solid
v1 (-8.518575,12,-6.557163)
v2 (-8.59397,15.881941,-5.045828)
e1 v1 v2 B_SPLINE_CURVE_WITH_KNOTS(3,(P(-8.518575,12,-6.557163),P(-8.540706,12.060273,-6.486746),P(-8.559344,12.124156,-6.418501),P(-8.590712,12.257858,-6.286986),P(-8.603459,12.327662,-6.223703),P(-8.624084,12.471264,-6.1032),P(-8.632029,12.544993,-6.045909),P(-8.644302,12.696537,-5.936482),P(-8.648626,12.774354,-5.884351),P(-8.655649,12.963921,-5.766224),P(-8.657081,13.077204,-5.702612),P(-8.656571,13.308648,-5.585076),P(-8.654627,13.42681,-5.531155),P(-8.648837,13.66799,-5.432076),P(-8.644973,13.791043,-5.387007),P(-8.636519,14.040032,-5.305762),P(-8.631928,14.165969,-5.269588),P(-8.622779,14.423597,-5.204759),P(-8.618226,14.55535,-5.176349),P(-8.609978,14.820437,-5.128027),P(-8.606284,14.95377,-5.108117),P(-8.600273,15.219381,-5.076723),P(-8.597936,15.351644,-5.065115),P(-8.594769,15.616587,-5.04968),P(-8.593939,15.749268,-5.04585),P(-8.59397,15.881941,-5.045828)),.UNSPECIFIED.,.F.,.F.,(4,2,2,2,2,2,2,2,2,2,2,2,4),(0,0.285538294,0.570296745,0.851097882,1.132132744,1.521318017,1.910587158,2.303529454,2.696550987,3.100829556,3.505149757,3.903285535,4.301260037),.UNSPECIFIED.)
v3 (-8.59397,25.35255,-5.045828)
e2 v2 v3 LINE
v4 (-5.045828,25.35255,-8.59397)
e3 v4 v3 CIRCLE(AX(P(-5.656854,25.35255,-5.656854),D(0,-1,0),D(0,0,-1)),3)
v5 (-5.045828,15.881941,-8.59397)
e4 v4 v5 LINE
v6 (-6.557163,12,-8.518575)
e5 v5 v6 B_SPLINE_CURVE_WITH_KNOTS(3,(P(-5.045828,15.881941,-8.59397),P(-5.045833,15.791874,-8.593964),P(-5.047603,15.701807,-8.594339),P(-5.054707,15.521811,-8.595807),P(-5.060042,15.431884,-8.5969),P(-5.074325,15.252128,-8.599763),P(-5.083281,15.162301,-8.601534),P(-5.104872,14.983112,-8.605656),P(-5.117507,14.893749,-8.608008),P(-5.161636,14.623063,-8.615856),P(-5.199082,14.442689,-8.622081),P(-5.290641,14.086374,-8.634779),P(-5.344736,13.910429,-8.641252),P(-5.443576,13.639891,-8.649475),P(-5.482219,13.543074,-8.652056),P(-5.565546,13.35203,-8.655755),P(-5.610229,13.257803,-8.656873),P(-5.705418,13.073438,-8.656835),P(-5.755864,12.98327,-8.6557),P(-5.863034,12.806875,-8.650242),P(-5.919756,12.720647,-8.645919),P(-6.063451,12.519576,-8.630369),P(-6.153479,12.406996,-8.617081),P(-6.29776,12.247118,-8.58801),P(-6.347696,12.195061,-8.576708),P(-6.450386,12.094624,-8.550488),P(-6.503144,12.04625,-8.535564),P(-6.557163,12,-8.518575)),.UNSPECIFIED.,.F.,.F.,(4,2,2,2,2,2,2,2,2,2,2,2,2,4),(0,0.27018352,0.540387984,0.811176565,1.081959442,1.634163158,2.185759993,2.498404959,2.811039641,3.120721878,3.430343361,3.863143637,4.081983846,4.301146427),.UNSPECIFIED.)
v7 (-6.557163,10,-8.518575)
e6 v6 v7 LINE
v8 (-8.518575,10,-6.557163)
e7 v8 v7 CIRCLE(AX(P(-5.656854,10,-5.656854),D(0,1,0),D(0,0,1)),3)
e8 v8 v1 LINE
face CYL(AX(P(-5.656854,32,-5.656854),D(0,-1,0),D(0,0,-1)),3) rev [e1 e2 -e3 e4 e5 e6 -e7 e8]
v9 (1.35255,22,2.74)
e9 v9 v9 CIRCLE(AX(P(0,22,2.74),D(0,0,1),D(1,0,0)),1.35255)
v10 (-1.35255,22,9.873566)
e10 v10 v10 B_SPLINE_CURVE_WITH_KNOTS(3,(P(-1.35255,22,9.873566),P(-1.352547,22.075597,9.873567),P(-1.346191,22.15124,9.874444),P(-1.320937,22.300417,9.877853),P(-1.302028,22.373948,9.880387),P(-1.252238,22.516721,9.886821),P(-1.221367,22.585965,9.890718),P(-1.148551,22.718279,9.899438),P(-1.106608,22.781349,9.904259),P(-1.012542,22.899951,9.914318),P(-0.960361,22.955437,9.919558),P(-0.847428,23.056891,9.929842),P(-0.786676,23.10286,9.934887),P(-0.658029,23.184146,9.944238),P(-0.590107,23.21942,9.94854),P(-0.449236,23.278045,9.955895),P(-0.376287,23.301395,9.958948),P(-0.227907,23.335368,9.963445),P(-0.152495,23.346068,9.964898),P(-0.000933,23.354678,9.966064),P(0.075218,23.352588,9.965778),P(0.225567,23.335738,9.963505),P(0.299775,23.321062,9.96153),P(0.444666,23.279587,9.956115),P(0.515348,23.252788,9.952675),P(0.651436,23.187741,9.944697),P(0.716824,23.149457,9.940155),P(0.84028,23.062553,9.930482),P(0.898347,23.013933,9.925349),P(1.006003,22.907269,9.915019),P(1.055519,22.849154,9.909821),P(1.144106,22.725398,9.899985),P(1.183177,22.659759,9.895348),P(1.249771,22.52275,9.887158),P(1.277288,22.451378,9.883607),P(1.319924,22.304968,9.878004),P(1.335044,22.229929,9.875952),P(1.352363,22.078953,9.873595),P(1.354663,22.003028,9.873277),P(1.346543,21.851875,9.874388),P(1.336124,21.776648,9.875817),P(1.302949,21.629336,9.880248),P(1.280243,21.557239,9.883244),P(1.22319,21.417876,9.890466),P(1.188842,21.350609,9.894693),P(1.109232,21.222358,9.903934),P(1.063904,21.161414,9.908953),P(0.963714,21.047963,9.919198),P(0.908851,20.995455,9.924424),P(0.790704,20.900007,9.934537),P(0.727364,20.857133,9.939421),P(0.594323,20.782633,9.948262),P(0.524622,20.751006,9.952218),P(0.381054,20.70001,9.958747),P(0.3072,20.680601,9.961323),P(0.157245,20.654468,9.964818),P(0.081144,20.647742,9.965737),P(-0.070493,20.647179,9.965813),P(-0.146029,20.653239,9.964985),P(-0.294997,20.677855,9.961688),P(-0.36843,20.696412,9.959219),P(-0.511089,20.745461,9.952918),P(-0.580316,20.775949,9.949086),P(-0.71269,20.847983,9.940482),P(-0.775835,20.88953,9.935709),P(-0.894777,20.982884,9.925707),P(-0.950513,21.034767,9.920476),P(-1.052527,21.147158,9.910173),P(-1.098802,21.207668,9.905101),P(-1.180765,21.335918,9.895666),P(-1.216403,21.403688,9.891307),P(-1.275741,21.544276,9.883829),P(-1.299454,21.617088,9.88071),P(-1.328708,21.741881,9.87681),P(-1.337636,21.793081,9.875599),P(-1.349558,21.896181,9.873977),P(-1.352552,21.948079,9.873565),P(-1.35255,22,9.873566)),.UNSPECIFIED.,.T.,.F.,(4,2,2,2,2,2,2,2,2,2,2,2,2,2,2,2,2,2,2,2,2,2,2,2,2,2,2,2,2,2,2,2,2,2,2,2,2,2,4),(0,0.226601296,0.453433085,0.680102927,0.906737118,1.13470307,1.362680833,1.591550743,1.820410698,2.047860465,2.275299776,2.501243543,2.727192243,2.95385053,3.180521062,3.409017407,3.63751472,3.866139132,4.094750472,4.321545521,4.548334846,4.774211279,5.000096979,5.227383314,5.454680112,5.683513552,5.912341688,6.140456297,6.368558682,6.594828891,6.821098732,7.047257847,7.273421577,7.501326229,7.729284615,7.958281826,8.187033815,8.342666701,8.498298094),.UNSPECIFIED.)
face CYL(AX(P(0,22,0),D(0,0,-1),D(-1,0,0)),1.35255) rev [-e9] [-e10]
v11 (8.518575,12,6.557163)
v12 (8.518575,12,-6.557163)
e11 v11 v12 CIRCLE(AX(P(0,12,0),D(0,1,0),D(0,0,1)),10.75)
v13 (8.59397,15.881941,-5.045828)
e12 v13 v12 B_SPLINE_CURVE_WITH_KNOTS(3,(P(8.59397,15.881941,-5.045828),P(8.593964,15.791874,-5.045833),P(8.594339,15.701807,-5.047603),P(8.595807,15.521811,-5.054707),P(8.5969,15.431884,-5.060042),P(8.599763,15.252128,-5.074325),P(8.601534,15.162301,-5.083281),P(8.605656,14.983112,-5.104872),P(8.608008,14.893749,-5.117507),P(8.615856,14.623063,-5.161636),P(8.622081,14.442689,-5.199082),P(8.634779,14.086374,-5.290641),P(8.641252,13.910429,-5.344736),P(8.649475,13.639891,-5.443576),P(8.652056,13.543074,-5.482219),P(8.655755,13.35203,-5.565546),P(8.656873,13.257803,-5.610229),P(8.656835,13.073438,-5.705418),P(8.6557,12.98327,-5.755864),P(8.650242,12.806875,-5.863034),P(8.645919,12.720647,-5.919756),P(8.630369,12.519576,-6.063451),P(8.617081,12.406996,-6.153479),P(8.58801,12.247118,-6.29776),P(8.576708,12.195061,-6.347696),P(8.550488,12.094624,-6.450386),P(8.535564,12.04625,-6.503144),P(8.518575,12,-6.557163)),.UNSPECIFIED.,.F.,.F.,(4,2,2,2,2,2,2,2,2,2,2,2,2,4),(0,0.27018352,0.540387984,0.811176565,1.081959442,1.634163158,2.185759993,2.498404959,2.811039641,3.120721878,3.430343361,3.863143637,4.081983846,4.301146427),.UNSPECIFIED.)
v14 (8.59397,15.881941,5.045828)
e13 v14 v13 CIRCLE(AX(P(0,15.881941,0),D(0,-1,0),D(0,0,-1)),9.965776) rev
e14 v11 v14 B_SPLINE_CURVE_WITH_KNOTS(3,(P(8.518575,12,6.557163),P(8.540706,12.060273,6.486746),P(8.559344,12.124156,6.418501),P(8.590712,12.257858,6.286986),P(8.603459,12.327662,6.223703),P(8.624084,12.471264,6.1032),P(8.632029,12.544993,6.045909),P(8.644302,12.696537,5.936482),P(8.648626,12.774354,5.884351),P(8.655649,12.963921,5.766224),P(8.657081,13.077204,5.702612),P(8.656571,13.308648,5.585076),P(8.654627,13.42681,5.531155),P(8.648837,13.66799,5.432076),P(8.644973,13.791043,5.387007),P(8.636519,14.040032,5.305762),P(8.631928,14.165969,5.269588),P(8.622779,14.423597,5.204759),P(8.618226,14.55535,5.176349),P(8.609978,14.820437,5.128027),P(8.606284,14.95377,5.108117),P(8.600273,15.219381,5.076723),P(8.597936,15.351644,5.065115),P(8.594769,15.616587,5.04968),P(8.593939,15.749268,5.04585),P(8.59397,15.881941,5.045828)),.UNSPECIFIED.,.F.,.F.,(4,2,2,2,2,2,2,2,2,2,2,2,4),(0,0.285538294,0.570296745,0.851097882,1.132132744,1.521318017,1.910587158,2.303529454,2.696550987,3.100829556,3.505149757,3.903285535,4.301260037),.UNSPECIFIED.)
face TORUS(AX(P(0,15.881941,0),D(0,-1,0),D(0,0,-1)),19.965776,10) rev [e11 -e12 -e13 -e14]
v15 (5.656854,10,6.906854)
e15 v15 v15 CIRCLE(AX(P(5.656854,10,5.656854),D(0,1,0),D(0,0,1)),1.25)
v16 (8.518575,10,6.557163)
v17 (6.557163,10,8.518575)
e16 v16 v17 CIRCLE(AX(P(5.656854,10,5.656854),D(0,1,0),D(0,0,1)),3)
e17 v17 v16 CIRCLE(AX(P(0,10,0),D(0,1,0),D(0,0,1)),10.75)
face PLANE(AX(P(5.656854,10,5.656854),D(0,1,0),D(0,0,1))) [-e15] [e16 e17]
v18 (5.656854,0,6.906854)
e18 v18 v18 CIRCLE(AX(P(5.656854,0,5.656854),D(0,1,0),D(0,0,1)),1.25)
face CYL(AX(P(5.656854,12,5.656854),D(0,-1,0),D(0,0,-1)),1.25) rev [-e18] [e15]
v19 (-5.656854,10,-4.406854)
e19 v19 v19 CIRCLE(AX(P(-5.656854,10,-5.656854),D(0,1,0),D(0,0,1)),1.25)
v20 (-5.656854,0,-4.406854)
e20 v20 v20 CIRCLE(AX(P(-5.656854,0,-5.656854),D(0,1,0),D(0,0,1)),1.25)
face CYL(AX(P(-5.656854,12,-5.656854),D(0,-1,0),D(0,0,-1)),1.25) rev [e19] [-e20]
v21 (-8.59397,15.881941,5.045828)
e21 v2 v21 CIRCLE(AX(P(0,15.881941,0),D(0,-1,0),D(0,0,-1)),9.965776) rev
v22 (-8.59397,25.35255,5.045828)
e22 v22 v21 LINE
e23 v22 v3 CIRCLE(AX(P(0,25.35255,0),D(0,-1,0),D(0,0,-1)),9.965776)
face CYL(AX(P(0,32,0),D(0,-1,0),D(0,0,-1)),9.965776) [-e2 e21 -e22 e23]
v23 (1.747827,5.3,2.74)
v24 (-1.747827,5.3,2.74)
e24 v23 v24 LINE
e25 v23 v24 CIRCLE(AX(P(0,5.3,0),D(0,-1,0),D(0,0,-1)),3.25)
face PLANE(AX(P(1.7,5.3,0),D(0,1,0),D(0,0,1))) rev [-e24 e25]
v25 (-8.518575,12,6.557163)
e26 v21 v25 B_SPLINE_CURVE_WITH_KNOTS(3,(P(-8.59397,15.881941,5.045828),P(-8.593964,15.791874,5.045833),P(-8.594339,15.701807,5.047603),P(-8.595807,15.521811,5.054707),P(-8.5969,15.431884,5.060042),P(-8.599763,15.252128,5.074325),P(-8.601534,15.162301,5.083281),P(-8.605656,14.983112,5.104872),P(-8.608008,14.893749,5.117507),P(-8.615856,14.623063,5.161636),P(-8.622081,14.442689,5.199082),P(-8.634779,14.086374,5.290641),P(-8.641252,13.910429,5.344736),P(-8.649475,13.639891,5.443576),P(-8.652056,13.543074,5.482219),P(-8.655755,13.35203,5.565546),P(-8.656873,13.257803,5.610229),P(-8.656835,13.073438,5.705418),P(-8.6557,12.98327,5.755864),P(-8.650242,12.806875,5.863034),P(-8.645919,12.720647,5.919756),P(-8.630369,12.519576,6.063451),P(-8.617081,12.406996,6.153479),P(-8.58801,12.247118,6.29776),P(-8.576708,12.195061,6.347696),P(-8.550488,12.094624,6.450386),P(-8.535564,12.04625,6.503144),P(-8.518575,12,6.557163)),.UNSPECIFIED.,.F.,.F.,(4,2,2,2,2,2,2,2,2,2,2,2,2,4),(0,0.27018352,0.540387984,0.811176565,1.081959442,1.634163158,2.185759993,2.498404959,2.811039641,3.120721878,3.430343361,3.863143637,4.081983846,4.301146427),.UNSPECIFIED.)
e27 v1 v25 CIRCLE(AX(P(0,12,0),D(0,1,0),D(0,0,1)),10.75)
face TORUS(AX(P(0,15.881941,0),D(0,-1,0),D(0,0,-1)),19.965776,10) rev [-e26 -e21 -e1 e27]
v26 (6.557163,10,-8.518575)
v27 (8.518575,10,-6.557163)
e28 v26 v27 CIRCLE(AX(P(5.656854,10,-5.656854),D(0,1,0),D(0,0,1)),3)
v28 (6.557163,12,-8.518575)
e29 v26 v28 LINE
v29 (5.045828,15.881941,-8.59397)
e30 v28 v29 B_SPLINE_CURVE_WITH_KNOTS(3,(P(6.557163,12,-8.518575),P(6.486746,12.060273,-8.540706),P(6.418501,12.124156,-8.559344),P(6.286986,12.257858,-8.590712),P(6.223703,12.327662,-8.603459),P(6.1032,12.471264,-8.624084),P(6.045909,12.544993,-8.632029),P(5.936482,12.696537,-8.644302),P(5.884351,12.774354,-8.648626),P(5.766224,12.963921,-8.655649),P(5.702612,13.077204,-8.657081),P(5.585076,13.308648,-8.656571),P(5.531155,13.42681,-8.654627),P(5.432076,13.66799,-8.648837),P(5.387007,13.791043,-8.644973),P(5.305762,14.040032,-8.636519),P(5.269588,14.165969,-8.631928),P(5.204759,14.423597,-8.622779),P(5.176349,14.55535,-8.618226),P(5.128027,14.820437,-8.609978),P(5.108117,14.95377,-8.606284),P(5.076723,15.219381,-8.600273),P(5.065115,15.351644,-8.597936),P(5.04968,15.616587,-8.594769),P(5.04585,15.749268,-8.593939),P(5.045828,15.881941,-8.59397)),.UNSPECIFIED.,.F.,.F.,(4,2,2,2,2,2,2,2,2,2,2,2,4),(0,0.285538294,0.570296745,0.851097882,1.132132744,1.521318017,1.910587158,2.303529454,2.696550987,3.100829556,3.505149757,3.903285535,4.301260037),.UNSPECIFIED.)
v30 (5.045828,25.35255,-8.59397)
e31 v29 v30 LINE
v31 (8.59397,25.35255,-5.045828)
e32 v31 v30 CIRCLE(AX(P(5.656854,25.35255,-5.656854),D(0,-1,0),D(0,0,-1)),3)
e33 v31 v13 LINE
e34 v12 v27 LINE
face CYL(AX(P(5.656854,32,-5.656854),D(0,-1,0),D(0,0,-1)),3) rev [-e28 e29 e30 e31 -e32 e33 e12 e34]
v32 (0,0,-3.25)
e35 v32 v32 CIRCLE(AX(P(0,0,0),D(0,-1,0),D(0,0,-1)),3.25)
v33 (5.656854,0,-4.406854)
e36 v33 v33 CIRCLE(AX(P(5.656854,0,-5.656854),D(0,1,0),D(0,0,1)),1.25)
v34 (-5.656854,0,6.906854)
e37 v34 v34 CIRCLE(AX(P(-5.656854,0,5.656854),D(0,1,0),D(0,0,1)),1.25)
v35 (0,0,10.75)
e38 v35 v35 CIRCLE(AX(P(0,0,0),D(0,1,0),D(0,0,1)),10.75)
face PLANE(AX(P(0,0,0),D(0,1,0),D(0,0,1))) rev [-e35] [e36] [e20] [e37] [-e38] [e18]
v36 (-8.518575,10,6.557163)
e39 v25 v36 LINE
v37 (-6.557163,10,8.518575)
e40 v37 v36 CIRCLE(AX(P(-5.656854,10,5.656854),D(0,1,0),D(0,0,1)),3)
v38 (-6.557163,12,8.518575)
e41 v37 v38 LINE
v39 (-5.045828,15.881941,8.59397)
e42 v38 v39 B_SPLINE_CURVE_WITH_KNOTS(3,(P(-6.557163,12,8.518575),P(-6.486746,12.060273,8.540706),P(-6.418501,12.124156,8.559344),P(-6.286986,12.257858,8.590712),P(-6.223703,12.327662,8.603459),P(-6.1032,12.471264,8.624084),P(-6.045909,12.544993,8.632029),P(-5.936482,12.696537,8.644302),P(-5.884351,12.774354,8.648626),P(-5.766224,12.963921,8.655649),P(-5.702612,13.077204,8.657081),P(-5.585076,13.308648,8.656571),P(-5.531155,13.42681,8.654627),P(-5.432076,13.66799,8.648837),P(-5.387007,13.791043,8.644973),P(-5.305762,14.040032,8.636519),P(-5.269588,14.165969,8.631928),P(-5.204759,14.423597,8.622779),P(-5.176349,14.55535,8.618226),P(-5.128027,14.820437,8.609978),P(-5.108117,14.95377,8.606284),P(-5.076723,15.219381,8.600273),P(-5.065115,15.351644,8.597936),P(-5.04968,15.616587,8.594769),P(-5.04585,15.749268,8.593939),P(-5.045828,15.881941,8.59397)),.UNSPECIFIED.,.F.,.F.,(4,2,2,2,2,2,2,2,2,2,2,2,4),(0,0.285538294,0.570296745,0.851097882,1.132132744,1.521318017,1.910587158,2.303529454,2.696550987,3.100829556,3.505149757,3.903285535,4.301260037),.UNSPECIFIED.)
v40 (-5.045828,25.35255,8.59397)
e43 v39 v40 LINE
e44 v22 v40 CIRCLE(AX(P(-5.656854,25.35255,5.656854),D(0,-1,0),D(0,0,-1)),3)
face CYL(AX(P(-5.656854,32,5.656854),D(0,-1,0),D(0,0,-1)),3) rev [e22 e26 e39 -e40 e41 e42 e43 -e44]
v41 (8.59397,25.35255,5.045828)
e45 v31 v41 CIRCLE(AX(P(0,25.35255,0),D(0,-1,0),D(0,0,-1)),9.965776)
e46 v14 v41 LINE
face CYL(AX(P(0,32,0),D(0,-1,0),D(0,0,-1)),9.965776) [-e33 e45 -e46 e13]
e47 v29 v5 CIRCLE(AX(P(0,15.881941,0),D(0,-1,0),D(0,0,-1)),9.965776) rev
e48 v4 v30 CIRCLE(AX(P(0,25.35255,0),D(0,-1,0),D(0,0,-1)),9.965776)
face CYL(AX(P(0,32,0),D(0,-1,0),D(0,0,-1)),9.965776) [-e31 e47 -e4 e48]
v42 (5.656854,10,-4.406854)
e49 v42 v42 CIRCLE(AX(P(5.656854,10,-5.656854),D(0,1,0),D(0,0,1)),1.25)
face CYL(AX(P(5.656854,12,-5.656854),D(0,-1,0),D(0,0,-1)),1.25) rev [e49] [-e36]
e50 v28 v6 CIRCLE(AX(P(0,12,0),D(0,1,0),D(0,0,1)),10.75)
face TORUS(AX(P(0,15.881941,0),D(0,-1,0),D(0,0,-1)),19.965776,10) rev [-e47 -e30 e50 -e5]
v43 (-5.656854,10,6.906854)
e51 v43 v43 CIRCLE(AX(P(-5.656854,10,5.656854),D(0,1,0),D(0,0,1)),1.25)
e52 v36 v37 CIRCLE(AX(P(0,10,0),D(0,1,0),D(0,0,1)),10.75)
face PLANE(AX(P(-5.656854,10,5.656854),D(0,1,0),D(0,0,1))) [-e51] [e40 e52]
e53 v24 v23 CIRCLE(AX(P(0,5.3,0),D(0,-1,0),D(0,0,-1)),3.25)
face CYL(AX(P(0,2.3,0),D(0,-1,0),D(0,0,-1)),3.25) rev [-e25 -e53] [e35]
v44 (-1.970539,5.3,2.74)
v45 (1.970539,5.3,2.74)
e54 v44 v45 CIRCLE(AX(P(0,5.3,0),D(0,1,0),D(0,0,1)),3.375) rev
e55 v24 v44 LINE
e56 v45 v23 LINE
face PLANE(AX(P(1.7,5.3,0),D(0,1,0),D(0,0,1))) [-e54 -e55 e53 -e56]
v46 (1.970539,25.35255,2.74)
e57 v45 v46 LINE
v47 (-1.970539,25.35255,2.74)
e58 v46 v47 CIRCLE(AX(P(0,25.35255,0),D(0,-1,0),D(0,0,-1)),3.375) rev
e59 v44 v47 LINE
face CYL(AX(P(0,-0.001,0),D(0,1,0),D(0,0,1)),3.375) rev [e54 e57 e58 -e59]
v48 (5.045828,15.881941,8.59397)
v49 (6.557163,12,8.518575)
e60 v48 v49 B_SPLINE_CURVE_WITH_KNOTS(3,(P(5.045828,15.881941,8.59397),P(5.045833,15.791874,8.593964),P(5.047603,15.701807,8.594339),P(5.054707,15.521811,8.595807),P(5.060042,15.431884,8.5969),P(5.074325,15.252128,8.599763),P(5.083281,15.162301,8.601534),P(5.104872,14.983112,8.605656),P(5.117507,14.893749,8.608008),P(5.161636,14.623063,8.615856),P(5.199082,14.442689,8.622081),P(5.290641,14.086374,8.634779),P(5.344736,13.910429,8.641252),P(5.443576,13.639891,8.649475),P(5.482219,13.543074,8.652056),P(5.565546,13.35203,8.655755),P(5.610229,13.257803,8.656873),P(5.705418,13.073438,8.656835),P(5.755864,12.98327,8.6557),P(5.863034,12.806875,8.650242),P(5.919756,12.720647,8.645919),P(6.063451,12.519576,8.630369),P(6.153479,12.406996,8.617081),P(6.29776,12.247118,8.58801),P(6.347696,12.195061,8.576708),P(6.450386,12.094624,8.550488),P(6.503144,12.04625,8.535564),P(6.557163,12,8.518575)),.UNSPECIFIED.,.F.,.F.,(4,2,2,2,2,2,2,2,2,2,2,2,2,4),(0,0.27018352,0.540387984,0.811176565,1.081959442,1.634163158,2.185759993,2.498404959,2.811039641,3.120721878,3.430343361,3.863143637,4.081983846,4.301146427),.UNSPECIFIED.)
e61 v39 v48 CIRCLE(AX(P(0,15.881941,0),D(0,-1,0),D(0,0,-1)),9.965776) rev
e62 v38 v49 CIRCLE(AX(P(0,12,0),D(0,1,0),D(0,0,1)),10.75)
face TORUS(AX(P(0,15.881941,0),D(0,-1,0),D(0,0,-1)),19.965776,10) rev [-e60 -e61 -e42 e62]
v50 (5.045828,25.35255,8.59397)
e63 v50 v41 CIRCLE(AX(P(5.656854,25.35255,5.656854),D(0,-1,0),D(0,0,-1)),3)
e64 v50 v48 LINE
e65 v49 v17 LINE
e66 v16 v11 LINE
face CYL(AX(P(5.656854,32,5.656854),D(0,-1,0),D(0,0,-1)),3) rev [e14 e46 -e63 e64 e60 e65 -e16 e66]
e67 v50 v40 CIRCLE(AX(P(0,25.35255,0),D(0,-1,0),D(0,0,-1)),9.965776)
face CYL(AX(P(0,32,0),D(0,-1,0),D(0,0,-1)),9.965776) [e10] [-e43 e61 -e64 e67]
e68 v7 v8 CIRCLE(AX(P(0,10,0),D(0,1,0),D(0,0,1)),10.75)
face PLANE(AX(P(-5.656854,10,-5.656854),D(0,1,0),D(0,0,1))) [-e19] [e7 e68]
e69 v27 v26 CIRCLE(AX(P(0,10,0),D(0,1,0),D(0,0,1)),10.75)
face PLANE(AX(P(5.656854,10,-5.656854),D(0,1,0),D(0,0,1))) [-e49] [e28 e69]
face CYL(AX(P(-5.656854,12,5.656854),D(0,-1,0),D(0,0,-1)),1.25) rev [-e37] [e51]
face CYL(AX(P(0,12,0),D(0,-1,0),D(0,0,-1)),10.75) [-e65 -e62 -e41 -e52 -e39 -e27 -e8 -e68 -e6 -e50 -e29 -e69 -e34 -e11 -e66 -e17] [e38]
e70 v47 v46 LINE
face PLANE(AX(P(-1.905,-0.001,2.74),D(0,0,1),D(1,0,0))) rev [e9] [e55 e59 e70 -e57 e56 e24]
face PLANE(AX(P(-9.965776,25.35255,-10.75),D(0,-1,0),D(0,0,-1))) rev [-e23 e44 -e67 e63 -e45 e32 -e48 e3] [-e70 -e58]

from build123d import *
from build123d.topology import SkipClean

# Parameters (mm, degrees)
SKETCH1_R                      = 10.75
SKETCH1_R_2                    = 1.25
BOSS_EXTRUDE1_DEPTH            = 12
SKETCH14_R                     = 3.25
CUT_EXTRUDE3_DEPTH             = 2.3
CBORE_FOR_M3_SHCS2_D           = 3.4
CBORE_FOR_M3_SHCS2_CBORE_D     = 6.5
CBORE_FOR_M3_SHCS2_CBORE_DEPTH = 3
SKETCH3_R                      = 9.965776233
BOSS_EXTRUDE2_DEPTH            = 20
CUT_EXTRUDE2_REACH             = 37.428
CUT_EXTRUDE1_DEPTH             = 26.122201337
CUT_EXTRUDE1_DEPTH_BACK        = 2
SKETCH2_R                      = 3
SKETCH8_W                      = 1.35255
SKETCH8_H                      = 9.965776233
MOVE_START                     = 5.3
MOVE_FACE1_DEPTH               = 26.7
FILLET1_R                      = 10
CUT_EXTRUDE4_DEPTH             = 36.427743517
CUT_EXTRUDE4_DEPTH_BACK        = 36.427743517
SKETCH15_W                     = 19.931552466
SKETCH15_H                     = 6.64745


# Read off the part's stored shape, not the designer's step: Move Face1
with BuildPart() as part:
    # Sketch1 → Boss-Extrude1 (new body)
    with BuildSketch(Plane(origin=(0, 0, 0), x_dir=(1, 0, 0), z_dir=(0, 1, 0))):
        with Locations(Location((0, 0, 0), (0, 0, 270))):
            Circle(SKETCH1_R)
        with Locations(Location((-5.656854249, 5.656854249, 0), (0, 0, 270))):
            Circle(SKETCH1_R_2, mode=Mode.SUBTRACT)
        with Locations(Location((5.656854249, 5.656854249, 0), (0, 0, 270))):
            Circle(SKETCH1_R_2, mode=Mode.SUBTRACT)
        with Locations(Location((5.656854249, -5.656854249, 0), (0, 0, 270))):
            Circle(SKETCH1_R_2, mode=Mode.SUBTRACT)
        with Locations(Location((-5.656854249, -5.656854249, 0), (0, 0, 270))):
            Circle(SKETCH1_R_2, mode=Mode.SUBTRACT)
    extrude(amount=BOSS_EXTRUDE1_DEPTH)

    # Sketch14 → Cut-Extrude3 (cut)
    with BuildSketch(Plane.XZ):
        with Locations(Location((0, 0, 0), (0, 0, 270))):
            Circle(SKETCH14_R)
    extrude(amount=-CUT_EXTRUDE3_DEPTH, mode=Mode.SUBTRACT)

    # CBORE for M3 SHCS2 (through all)
    with Locations(Plane(origin=(0, 2.3, 0), x_dir=(-1, 0, 0), z_dir=(0, -1, 0))):
        with Locations((0, 0)):
            CounterBoreHole(CBORE_FOR_M3_SHCS2_D / 2, CBORE_FOR_M3_SHCS2_CBORE_D / 2, CBORE_FOR_M3_SHCS2_CBORE_DEPTH)

    # Sketch3 → Boss-Extrude2 (add)
    with BuildSketch(Plane(origin=(0, 12, 0), x_dir=(1, 0, 0), z_dir=(0, 1, 0))):
        with Locations(Location((0, 0, 0), (0, 0, 270))):
            Circle(SKETCH3_R)
    extrude(amount=BOSS_EXTRUDE2_DEPTH)

    # Sketch5 → Cut-Extrude2 (cut, up to next)
    with BuildSketch(Plane(origin=(0, 32, 0), x_dir=(1, 0, 0), z_dir=(0, 1, 0)), mode=Mode.PRIVATE) as cut_extrude2_sk1:
        with BuildLine():
            Line((-1.905, -2.54), (1.905, -2.54))
            ThreePointArc((1.905, -2.54), (0, 3.175), (-1.905, -2.54))
        make_face()
    cut_extrude2_tool1 = extrude(cut_extrude2_sk1.sketch, amount=-CUT_EXTRUDE2_REACH, mode=Mode.PRIVATE) & part.part
    add(cut_extrude2_tool1.solids().sort_by_distance((0, 32, -0.153521))[0], mode=Mode.SUBTRACT)

    # Sketch2 → Cut-Extrude1 (cut, two sides: drawn at the far end of the back side and taken through both)
    with BuildSketch(Plane(origin=(0, 12, 0), x_dir=(1, 0, 0), z_dir=(0, 1, 0)).offset(-CUT_EXTRUDE1_DEPTH_BACK)):
        with Locations((-5.656854249, 5.656854249)):
            Circle(SKETCH2_R)
        with Locations((5.656854249, 5.656854249)):
            Circle(SKETCH2_R)
        with Locations((5.656854249, -5.656854249)):
            Circle(SKETCH2_R)
        with Locations((-5.656854249, -5.656854249)):
            Circle(SKETCH2_R)
    extrude(amount=CUT_EXTRUDE1_DEPTH + CUT_EXTRUDE1_DEPTH_BACK, mode=Mode.SUBTRACT)

    # Sketch8 → Tap Drill for M3x0.5 Tap1 (revolve, cut)
    with BuildSketch(Plane(origin=(0, 22, 0), x_dir=(0, 1, 0), z_dir=(1, 0, 0))):
        with Locations((0.676275, 4.982888117)):
            Rectangle(SKETCH8_W, SKETCH8_H)
    revolve(axis=Axis((0, 22, -6.35), (0, 0, 1)), mode=Mode.SUBTRACT)

    # Move Face1 outline → Move Face1 (cut)
    with BuildSketch(Plane(origin=(0, 0, 0), x_dir=(1, 0, 0), z_dir=(0, 1, 0)).offset(MOVE_START)):
        with BuildLine():
            Line((-1.970539266, -2.74), (1.970539266, -2.74))
            ThreePointArc((1.970539266, -2.74), (0, 3.375), (-1.970539266, -2.74))
        make_face()
        with BuildLine():
            ThreePointArc((-1.905, -2.54), (0, 3.175), (1.905, -2.54))
            Line((1.905, -2.54), (-1.905, -2.54))
        make_face(mode=Mode.SUBTRACT)
    extrude(amount=MOVE_FACE1_DEPTH, mode=Mode.SUBTRACT)

    # Fillet1
    # the kernel refuses this fillet: 10 mm, written as the material it adds along each edge
    with BuildSketch(Plane(origin=(0, 12, 0), x_dir=(0.9978298678102888, 0, -0.06584493075174137), z_dir=(0.06584493075174137, 0, 0.9978298678102888))) as fillet1_piece_1_section:
        with BuildLine():
            CenterArc((19.965776233, 3.881941321), FILLET1_R, 180, 22.842179606)
            Line((9.965776233, 3.881941321), (9.765776233, 3.881941321))
            Line((9.765776233, 3.881941321), (9.765776233, 0))
            Line((9.765776233, 0), (9.965776233, -0.2))
            ThreePointArc((9.965776233, -0.2), (10.357888117, -0.2), (10.565684475, -0.077638826))
            Line((10.565684475, -0.077638826), (10.75, 0))
        make_face()
    fillet1_piece_1 = revolve(axis=Axis((0, 12, 0), (0, 1, 0)), revolution_arc=172.449263909, mode=Mode.PRIVATE)
    fillet1_piece_1 = fillet1_piece_1 - Plane(origin=(-5.656854249, 13.230633789, -5.656854249), x_dir=(1, 0, 0), z_dir=(0, 1, 0)) * Cylinder(3, 44, mode=Mode.PRIVATE)
    fillet1_piece_1 = fillet1_piece_1 - Plane(origin=(5.656854249, 13.230633789, -5.656854249), x_dir=(1, 0, 0), z_dir=(0, 1, 0)) * Cylinder(3, 44, mode=Mode.PRIVATE)
    add(fillet1_piece_1)
    with BuildSketch(Plane(origin=(0, 12, 0), x_dir=(0.06584493075180471, 0, 0.9978298678102845), z_dir=(-0.9978298678102845, 0, 0.06584493075180471))) as fillet1_piece_2_section:
        with BuildLine():
            CenterArc((19.965776233, 3.881941321), FILLET1_R, 180, 22.842179606)
            Line((9.965776233, 3.881941321), (9.765776233, 3.881941321))
            Line((9.765776233, 3.881941321), (9.765776233, 0))
            Line((9.765776233, 0), (9.965776233, -0.2))
            ThreePointArc((9.965776233, -0.2), (10.357888116, -0.2), (10.565684475, -0.077638826))
            Line((10.565684475, -0.077638826), (10.75, 0))
        make_face()
    fillet1_piece_2 = revolve(axis=Axis((0, 12, 0), (0, 1, 0)), revolution_arc=172.449263909, mode=Mode.PRIVATE)
    fillet1_piece_2 = fillet1_piece_2 - Plane(origin=(5.656854249, 13.23063377, 5.656854249), x_dir=(1, 0, 0), z_dir=(0, 1, 0)) * Cylinder(3, 43, mode=Mode.PRIVATE)
    fillet1_piece_2 = fillet1_piece_2 - Plane(origin=(5.656854249, 13.23063377, -5.656854249), x_dir=(1, 0, 0), z_dir=(0, 1, 0)) * Cylinder(3, 43, mode=Mode.PRIVATE)
    add(fillet1_piece_2)
    with BuildSketch(Plane(origin=(0, 12, 0), x_dir=(0.9978298678102888, 0, 0.0658449307517424), z_dir=(0.0658449307517424, 0, -0.9978298678102888))) as fillet1_piece_3_section:
        with BuildLine():
            CenterArc((19.965776233, -3.881941321), FILLET1_R, 157.157820394, 22.842179606)
            Line((9.965776233, -3.881941321), (9.765776233, -3.881941321))
            Line((9.765776233, -3.881941321), (9.765776233, 0))
            Line((9.765776233, 0), (9.965776233, 0.2))
            ThreePointArc((9.965776233, 0.2), (10.357888116, 0.2), (10.565684475, 0.077638826))
            Line((10.565684475, 0.077638826), (10.75, 0))
        make_face()
    fillet1_piece_3 = revolve(axis=Axis((0, 12, 0), (0, -1, 0)), revolution_arc=172.449263909, mode=Mode.PRIVATE)
    fillet1_piece_3 = fillet1_piece_3 - Plane(origin=(5.656854249, 13.230633816, 5.656854249), x_dir=(1, 0, 0), z_dir=(0, 1, 0)) * Cylinder(3, 44, mode=Mode.PRIVATE)
    fillet1_piece_3 = fillet1_piece_3 - Plane(origin=(-5.656854249, 13.230633816, 5.656854249), x_dir=(1, 0, 0), z_dir=(0, 1, 0)) * Cylinder(3, 44, mode=Mode.PRIVATE)
    add(fillet1_piece_3)
    with BuildSketch(Plane(origin=(0, 12, 0), x_dir=(-0.06584493075180468, 0, -0.9978298678102845), z_dir=(0.9978298678102845, 0, -0.06584493075180468))) as fillet1_piece_4_section:
        with BuildLine():
            CenterArc((19.965776233, 3.881941321), FILLET1_R, 180, 22.842179606)
            Line((9.965776233, 3.881941321), (9.765776233, 3.881941321))
            Line((9.765776233, 3.881941321), (9.765776233, 0))
            Line((9.765776233, 0), (9.965776233, -0.2))
            ThreePointArc((9.965776233, -0.2), (10.357888116, -0.2), (10.565684475, -0.077638826))
            Line((10.565684475, -0.077638826), (10.75, 0))
        make_face()
    fillet1_piece_4 = revolve(axis=Axis((0, 12, 0), (0, 1, 0)), revolution_arc=172.449263909, mode=Mode.PRIVATE)
    fillet1_piece_4 = fillet1_piece_4 - Plane(origin=(-5.656854249, 13.23063377, 5.656854249), x_dir=(1, 0, 0), z_dir=(0, 1, 0)) * Cylinder(3, 44, mode=Mode.PRIVATE)
    fillet1_piece_4 = fillet1_piece_4 - Plane(origin=(-5.656854249, 13.23063377, -5.656854249), x_dir=(1, 0, 0), z_dir=(0, 1, 0)) * Cylinder(3, 44, mode=Mode.PRIVATE)
    add(fillet1_piece_4)

    # Sketch15 → Cut-Extrude4 (cut, two sides: drawn at the far end of the back side and taken through both)
    with SkipClean():  # the faces are left unmerged after this step: merging them gives an invalid solid
        with BuildSketch(Plane.XY.offset(-CUT_EXTRUDE4_DEPTH_BACK)):
            with Locations((0, 28.676275)):
                Rectangle(SKETCH15_W, SKETCH15_H)
        extrude(amount=CUT_EXTRUDE4_DEPTH + CUT_EXTRUDE4_DEPTH_BACK, mode=Mode.SUBTRACT)


solid = part.part
